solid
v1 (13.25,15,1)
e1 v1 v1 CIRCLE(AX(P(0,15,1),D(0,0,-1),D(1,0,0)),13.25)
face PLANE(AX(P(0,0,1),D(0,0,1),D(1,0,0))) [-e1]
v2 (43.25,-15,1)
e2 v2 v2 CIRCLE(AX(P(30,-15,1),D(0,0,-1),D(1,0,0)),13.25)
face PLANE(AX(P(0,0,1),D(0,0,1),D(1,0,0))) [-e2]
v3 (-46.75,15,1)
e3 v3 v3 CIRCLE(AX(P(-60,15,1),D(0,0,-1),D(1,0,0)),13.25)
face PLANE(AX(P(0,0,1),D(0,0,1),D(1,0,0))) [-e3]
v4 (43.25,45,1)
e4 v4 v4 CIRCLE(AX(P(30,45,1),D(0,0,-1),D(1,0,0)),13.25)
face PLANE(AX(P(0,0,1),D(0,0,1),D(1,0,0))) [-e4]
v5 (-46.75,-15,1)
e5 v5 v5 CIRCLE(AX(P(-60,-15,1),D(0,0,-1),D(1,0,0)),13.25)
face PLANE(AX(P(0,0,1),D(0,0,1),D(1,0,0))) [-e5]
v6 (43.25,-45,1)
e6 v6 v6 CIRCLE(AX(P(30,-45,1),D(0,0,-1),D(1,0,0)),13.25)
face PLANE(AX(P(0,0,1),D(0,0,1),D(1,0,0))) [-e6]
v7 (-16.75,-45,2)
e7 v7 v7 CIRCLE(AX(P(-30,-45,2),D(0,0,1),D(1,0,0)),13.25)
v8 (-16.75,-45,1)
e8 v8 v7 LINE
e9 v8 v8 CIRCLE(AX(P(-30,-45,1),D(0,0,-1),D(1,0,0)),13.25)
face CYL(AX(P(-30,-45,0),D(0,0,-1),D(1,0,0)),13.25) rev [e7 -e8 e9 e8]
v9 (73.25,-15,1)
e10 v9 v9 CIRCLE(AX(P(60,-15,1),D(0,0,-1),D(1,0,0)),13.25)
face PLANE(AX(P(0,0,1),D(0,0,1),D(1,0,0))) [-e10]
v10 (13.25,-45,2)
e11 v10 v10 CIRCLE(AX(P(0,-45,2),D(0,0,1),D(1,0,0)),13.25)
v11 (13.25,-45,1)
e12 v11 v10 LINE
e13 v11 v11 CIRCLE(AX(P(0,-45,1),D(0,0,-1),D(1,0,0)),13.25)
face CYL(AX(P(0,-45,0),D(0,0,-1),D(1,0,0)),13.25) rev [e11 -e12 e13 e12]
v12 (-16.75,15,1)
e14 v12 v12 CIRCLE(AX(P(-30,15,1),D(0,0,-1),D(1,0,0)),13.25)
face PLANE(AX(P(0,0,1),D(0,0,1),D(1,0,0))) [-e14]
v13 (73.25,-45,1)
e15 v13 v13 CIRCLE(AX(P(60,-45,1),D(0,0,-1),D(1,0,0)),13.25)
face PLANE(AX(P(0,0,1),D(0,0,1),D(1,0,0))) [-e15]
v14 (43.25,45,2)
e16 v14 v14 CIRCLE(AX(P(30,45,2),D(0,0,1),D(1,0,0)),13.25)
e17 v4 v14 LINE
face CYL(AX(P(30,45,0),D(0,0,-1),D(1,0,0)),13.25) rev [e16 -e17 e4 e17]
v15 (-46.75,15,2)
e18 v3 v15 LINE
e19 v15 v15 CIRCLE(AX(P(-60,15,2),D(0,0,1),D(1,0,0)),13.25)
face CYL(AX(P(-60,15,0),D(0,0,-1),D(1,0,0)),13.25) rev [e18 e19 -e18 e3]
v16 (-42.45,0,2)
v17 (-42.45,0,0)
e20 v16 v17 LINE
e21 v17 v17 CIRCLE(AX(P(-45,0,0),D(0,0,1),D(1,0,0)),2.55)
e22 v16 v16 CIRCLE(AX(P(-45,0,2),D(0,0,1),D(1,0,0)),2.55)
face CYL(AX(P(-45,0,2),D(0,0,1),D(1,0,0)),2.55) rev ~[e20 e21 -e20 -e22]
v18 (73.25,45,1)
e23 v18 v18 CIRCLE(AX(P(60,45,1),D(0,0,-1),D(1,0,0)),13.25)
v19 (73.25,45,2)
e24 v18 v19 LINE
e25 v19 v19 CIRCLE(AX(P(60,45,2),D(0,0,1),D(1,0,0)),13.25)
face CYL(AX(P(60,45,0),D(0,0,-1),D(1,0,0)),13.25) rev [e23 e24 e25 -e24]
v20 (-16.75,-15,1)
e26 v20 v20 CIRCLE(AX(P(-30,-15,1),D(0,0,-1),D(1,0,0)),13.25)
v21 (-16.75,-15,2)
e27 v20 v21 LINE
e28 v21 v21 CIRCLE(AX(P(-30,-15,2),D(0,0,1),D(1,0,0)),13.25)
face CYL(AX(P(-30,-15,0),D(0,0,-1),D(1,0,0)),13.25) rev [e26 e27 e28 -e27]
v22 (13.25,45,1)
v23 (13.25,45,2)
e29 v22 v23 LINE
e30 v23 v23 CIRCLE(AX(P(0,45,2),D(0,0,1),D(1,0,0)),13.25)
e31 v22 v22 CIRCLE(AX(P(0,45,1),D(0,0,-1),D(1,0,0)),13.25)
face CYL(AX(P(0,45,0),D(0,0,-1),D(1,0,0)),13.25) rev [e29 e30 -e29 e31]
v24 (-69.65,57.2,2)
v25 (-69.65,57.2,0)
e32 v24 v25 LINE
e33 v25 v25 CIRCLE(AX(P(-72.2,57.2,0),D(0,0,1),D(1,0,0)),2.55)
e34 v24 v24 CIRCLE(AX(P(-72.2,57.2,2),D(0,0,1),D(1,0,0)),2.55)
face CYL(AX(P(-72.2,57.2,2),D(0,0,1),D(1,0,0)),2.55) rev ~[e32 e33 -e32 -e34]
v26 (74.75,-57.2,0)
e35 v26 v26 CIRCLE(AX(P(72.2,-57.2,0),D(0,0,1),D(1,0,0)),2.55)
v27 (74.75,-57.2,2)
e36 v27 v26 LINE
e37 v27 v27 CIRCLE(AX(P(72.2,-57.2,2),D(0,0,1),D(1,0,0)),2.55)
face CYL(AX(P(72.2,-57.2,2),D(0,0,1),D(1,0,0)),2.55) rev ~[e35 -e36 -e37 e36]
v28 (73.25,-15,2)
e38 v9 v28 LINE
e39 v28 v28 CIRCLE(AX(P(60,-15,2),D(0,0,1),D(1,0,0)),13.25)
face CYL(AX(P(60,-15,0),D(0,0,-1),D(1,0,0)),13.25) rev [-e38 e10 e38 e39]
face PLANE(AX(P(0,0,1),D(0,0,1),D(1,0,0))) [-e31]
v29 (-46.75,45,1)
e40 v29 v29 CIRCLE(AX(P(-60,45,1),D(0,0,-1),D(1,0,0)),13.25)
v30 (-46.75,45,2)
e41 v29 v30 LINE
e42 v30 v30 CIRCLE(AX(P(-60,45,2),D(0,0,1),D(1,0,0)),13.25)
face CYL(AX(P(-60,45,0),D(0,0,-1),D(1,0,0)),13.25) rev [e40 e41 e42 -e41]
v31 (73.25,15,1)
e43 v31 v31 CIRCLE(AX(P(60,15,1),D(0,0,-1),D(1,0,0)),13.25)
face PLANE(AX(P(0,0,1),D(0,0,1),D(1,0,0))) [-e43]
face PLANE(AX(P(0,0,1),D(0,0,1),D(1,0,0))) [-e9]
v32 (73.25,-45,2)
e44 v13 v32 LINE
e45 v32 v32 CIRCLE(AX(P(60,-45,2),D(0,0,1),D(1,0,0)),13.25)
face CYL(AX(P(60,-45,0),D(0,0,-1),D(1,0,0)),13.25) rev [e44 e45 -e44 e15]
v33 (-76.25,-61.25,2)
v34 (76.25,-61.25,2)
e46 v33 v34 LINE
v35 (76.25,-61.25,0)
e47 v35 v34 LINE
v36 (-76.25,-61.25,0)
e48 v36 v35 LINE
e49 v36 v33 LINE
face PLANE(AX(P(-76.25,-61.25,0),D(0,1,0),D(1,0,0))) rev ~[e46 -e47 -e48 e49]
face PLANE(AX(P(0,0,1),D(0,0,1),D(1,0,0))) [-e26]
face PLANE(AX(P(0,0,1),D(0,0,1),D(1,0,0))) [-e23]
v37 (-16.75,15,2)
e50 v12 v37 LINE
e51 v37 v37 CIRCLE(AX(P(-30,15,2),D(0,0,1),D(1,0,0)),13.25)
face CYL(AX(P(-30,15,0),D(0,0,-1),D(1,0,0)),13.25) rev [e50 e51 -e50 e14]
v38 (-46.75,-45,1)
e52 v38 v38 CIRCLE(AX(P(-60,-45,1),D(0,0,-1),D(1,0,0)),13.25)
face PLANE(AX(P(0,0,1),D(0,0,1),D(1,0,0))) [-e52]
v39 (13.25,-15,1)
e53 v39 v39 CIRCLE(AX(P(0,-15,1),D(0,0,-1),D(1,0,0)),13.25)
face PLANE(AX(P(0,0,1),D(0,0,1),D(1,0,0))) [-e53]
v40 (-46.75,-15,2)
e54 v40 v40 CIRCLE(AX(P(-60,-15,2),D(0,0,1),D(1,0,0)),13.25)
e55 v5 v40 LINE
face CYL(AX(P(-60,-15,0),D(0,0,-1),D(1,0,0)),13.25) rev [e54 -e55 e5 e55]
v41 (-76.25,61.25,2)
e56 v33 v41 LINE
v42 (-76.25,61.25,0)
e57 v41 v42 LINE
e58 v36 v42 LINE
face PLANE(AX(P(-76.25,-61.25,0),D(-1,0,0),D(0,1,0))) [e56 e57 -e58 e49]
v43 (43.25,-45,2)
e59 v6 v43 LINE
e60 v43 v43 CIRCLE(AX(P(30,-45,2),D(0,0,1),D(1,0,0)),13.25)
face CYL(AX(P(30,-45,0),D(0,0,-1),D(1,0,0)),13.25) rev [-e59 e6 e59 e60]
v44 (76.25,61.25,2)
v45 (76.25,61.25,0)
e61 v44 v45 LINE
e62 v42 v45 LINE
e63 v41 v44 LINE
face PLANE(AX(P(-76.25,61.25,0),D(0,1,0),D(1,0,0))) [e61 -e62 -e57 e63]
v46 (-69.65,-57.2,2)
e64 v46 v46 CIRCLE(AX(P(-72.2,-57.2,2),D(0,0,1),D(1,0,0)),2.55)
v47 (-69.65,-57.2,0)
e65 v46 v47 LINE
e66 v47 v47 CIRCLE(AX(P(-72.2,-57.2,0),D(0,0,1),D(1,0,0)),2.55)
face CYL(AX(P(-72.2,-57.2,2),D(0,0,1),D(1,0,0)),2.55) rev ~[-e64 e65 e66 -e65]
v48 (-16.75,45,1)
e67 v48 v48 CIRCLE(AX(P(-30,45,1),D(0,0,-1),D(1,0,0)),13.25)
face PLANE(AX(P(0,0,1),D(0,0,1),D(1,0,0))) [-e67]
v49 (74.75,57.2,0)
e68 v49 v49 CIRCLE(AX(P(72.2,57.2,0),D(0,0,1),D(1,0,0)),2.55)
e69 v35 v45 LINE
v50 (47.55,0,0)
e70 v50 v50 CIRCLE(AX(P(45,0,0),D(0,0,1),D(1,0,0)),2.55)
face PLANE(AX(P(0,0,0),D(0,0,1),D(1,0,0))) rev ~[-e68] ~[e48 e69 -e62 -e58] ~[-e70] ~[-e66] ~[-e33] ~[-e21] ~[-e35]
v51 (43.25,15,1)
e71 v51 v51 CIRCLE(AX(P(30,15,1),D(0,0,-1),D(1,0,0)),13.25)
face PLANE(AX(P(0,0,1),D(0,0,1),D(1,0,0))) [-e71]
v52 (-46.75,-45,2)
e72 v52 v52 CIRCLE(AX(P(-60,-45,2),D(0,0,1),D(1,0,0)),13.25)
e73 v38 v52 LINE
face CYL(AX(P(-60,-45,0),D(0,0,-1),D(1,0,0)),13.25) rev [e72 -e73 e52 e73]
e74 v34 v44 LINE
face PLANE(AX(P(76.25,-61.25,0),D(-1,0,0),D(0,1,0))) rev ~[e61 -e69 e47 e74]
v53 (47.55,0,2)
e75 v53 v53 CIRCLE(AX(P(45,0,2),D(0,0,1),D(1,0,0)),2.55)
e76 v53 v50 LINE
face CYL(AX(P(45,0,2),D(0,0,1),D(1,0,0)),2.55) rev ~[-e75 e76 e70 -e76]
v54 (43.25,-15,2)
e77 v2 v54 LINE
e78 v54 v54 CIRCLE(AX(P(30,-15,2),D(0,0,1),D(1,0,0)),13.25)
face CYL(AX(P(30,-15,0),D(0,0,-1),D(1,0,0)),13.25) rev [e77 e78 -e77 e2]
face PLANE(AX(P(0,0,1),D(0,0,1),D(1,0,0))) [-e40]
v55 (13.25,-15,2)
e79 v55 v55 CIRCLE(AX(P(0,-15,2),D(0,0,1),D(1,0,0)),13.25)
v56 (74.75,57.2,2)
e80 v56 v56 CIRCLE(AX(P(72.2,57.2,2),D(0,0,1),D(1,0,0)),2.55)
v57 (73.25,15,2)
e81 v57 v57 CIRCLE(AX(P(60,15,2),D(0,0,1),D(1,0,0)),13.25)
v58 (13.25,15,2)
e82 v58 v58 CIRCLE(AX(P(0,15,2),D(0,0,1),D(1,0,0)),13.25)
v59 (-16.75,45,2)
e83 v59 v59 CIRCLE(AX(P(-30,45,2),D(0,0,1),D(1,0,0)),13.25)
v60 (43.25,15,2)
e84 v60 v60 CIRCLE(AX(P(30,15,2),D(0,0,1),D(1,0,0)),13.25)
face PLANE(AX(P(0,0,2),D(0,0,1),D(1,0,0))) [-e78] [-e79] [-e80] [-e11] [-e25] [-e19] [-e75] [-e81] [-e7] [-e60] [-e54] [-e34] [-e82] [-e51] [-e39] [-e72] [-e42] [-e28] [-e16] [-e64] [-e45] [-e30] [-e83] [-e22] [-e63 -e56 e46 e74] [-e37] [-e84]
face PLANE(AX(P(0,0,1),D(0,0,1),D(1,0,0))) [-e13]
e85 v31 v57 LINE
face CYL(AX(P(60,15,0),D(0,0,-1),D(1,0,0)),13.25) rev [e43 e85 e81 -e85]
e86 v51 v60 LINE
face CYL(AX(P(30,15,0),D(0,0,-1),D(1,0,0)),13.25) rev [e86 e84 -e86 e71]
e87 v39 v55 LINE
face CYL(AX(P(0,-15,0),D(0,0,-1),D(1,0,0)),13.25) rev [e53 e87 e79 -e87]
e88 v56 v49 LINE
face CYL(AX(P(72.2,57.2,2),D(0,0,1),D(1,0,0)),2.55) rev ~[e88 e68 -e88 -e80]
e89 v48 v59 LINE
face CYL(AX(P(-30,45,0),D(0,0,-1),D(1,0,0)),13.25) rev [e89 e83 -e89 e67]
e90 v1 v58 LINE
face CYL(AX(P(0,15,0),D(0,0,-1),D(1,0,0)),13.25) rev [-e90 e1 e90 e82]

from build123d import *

# Parameters (mm, degrees)
F0_W     = 152.5
F0_H     = 122.5
F0_R     = 13.25
F1_DEPTH = 1
F2_DEPTH = 2
F3_R     = 2.55
F4_DEPTH = 2.001


# Not quite as in the source:
# - a feature names something its author has since deleted; it is built from what else it names


with BuildPart() as f1:
    # F0 (on Top) → F1 (new body)
    with BuildSketch(Plane.XY):
        Rectangle(F0_W, F0_H)
        with Locations((-60, -45)):
            Circle(F0_R, mode=Mode.SUBTRACT)
        with Locations((-30, -45)):
            Circle(F0_R, mode=Mode.SUBTRACT)
        with Locations((-60, -15)):
            Circle(F0_R, mode=Mode.SUBTRACT)
        with Locations((-30, -15)):
            Circle(F0_R, mode=Mode.SUBTRACT)
        with Locations((0, -45)):
            Circle(F0_R, mode=Mode.SUBTRACT)
        with Locations((30, -45)):
            Circle(F0_R, mode=Mode.SUBTRACT)
        with Locations((60, -45)):
            Circle(F0_R, mode=Mode.SUBTRACT)
        with Locations((0, -15)):
            Circle(F0_R, mode=Mode.SUBTRACT)
        with Locations((30, -15)):
            Circle(F0_R, mode=Mode.SUBTRACT)
        with Locations((60, -15)):
            Circle(F0_R, mode=Mode.SUBTRACT)
        with Locations((-60, 15)):
            Circle(F0_R, mode=Mode.SUBTRACT)
        with Locations((-30, 15)):
            Circle(F0_R, mode=Mode.SUBTRACT)
        with Locations((-60, 45)):
            Circle(F0_R, mode=Mode.SUBTRACT)
        with Locations((-30, 45)):
            Circle(F0_R, mode=Mode.SUBTRACT)
        with Locations((0, 15)):
            Circle(F0_R, mode=Mode.SUBTRACT)
        with Locations((30, 15)):
            Circle(F0_R, mode=Mode.SUBTRACT)
        with Locations((60, 15)):
            Circle(F0_R, mode=Mode.SUBTRACT)
        with Locations((0, 45)):
            Circle(F0_R, mode=Mode.SUBTRACT)
        with Locations((30, 45)):
            Circle(F0_R, mode=Mode.SUBTRACT)
        with Locations((60, 45)):
            Circle(F0_R, mode=Mode.SUBTRACT)
        with Locations((-60, 45)):
            Circle(F0_R)
        with Locations((-30, 45)):
            Circle(F0_R)
        with Locations((0, 45)):
            Circle(F0_R)
        with Locations((30, 45)):
            Circle(F0_R)
        with Locations((60, 45)):
            Circle(F0_R)
        with Locations((60, 15)):
            Circle(F0_R)
        with Locations((30, 15)):
            Circle(F0_R)
        with Locations((-30, 15)):
            Circle(F0_R)
        with Locations((-60, 15)):
            Circle(F0_R)
        with Locations((0, 15)):
            Circle(F0_R)
        with Locations((0, -15)):
            Circle(F0_R)
        with Locations((-30, -15)):
            Circle(F0_R)
        with Locations((-60, -15)):
            Circle(F0_R)
        with Locations((30, -15)):
            Circle(F0_R)
        with Locations((60, -15)):
            Circle(F0_R)
        with Locations((30, -45)):
            Circle(F0_R)
        with Locations((60, -45)):
            Circle(F0_R)
        with Locations((0, -45)):
            Circle(F0_R)
        with Locations((-30, -45)):
            Circle(F0_R)
        with Locations((-60, -45)):
            Circle(F0_R)
    extrude(amount=F1_DEPTH)

    # F0 (on Top) → F2 (join)
    with BuildSketch(Plane.XY):
        Rectangle(F0_W, F0_H)
        with Locations((-60, -45)):
            Circle(F0_R, mode=Mode.SUBTRACT)
        with Locations((-30, -45)):
            Circle(F0_R, mode=Mode.SUBTRACT)
        with Locations((-60, -15)):
            Circle(F0_R, mode=Mode.SUBTRACT)
        with Locations((-30, -15)):
            Circle(F0_R, mode=Mode.SUBTRACT)
        with Locations((0, -45)):
            Circle(F0_R, mode=Mode.SUBTRACT)
        with Locations((30, -45)):
            Circle(F0_R, mode=Mode.SUBTRACT)
        with Locations((60, -45)):
            Circle(F0_R, mode=Mode.SUBTRACT)
        with Locations((0, -15)):
            Circle(F0_R, mode=Mode.SUBTRACT)
        with Locations((30, -15)):
            Circle(F0_R, mode=Mode.SUBTRACT)
        with Locations((60, -15)):
            Circle(F0_R, mode=Mode.SUBTRACT)
        with Locations((-60, 15)):
            Circle(F0_R, mode=Mode.SUBTRACT)
        with Locations((-30, 15)):
            Circle(F0_R, mode=Mode.SUBTRACT)
        with Locations((-60, 45)):
            Circle(F0_R, mode=Mode.SUBTRACT)
        with Locations((-30, 45)):
            Circle(F0_R, mode=Mode.SUBTRACT)
        with Locations((0, 15)):
            Circle(F0_R, mode=Mode.SUBTRACT)
        with Locations((30, 15)):
            Circle(F0_R, mode=Mode.SUBTRACT)
        with Locations((60, 15)):
            Circle(F0_R, mode=Mode.SUBTRACT)
        with Locations((0, 45)):
            Circle(F0_R, mode=Mode.SUBTRACT)
        with Locations((30, 45)):
            Circle(F0_R, mode=Mode.SUBTRACT)
        with Locations((60, 45)):
            Circle(F0_R, mode=Mode.SUBTRACT)
    extrude(amount=F2_DEPTH)

    # F3 (on face) → F4 (cut, through all)
    with BuildSketch(Plane.XY.offset(2)):
        with Locations((-72.2, 57.2)):
            Circle(F3_R)
        with Locations((-45, 0)):
            Circle(F3_R)
        with Locations((72.2, 57.2)):
            Circle(F3_R)
        with Locations((45, 0)):
            Circle(F3_R)
        with Locations((72.2, -57.2)):
            Circle(F3_R)
        with Locations((-72.2, -57.2)):
            Circle(F3_R)
    extrude(amount=-F4_DEPTH, mode=Mode.SUBTRACT)


solid = f1.part
